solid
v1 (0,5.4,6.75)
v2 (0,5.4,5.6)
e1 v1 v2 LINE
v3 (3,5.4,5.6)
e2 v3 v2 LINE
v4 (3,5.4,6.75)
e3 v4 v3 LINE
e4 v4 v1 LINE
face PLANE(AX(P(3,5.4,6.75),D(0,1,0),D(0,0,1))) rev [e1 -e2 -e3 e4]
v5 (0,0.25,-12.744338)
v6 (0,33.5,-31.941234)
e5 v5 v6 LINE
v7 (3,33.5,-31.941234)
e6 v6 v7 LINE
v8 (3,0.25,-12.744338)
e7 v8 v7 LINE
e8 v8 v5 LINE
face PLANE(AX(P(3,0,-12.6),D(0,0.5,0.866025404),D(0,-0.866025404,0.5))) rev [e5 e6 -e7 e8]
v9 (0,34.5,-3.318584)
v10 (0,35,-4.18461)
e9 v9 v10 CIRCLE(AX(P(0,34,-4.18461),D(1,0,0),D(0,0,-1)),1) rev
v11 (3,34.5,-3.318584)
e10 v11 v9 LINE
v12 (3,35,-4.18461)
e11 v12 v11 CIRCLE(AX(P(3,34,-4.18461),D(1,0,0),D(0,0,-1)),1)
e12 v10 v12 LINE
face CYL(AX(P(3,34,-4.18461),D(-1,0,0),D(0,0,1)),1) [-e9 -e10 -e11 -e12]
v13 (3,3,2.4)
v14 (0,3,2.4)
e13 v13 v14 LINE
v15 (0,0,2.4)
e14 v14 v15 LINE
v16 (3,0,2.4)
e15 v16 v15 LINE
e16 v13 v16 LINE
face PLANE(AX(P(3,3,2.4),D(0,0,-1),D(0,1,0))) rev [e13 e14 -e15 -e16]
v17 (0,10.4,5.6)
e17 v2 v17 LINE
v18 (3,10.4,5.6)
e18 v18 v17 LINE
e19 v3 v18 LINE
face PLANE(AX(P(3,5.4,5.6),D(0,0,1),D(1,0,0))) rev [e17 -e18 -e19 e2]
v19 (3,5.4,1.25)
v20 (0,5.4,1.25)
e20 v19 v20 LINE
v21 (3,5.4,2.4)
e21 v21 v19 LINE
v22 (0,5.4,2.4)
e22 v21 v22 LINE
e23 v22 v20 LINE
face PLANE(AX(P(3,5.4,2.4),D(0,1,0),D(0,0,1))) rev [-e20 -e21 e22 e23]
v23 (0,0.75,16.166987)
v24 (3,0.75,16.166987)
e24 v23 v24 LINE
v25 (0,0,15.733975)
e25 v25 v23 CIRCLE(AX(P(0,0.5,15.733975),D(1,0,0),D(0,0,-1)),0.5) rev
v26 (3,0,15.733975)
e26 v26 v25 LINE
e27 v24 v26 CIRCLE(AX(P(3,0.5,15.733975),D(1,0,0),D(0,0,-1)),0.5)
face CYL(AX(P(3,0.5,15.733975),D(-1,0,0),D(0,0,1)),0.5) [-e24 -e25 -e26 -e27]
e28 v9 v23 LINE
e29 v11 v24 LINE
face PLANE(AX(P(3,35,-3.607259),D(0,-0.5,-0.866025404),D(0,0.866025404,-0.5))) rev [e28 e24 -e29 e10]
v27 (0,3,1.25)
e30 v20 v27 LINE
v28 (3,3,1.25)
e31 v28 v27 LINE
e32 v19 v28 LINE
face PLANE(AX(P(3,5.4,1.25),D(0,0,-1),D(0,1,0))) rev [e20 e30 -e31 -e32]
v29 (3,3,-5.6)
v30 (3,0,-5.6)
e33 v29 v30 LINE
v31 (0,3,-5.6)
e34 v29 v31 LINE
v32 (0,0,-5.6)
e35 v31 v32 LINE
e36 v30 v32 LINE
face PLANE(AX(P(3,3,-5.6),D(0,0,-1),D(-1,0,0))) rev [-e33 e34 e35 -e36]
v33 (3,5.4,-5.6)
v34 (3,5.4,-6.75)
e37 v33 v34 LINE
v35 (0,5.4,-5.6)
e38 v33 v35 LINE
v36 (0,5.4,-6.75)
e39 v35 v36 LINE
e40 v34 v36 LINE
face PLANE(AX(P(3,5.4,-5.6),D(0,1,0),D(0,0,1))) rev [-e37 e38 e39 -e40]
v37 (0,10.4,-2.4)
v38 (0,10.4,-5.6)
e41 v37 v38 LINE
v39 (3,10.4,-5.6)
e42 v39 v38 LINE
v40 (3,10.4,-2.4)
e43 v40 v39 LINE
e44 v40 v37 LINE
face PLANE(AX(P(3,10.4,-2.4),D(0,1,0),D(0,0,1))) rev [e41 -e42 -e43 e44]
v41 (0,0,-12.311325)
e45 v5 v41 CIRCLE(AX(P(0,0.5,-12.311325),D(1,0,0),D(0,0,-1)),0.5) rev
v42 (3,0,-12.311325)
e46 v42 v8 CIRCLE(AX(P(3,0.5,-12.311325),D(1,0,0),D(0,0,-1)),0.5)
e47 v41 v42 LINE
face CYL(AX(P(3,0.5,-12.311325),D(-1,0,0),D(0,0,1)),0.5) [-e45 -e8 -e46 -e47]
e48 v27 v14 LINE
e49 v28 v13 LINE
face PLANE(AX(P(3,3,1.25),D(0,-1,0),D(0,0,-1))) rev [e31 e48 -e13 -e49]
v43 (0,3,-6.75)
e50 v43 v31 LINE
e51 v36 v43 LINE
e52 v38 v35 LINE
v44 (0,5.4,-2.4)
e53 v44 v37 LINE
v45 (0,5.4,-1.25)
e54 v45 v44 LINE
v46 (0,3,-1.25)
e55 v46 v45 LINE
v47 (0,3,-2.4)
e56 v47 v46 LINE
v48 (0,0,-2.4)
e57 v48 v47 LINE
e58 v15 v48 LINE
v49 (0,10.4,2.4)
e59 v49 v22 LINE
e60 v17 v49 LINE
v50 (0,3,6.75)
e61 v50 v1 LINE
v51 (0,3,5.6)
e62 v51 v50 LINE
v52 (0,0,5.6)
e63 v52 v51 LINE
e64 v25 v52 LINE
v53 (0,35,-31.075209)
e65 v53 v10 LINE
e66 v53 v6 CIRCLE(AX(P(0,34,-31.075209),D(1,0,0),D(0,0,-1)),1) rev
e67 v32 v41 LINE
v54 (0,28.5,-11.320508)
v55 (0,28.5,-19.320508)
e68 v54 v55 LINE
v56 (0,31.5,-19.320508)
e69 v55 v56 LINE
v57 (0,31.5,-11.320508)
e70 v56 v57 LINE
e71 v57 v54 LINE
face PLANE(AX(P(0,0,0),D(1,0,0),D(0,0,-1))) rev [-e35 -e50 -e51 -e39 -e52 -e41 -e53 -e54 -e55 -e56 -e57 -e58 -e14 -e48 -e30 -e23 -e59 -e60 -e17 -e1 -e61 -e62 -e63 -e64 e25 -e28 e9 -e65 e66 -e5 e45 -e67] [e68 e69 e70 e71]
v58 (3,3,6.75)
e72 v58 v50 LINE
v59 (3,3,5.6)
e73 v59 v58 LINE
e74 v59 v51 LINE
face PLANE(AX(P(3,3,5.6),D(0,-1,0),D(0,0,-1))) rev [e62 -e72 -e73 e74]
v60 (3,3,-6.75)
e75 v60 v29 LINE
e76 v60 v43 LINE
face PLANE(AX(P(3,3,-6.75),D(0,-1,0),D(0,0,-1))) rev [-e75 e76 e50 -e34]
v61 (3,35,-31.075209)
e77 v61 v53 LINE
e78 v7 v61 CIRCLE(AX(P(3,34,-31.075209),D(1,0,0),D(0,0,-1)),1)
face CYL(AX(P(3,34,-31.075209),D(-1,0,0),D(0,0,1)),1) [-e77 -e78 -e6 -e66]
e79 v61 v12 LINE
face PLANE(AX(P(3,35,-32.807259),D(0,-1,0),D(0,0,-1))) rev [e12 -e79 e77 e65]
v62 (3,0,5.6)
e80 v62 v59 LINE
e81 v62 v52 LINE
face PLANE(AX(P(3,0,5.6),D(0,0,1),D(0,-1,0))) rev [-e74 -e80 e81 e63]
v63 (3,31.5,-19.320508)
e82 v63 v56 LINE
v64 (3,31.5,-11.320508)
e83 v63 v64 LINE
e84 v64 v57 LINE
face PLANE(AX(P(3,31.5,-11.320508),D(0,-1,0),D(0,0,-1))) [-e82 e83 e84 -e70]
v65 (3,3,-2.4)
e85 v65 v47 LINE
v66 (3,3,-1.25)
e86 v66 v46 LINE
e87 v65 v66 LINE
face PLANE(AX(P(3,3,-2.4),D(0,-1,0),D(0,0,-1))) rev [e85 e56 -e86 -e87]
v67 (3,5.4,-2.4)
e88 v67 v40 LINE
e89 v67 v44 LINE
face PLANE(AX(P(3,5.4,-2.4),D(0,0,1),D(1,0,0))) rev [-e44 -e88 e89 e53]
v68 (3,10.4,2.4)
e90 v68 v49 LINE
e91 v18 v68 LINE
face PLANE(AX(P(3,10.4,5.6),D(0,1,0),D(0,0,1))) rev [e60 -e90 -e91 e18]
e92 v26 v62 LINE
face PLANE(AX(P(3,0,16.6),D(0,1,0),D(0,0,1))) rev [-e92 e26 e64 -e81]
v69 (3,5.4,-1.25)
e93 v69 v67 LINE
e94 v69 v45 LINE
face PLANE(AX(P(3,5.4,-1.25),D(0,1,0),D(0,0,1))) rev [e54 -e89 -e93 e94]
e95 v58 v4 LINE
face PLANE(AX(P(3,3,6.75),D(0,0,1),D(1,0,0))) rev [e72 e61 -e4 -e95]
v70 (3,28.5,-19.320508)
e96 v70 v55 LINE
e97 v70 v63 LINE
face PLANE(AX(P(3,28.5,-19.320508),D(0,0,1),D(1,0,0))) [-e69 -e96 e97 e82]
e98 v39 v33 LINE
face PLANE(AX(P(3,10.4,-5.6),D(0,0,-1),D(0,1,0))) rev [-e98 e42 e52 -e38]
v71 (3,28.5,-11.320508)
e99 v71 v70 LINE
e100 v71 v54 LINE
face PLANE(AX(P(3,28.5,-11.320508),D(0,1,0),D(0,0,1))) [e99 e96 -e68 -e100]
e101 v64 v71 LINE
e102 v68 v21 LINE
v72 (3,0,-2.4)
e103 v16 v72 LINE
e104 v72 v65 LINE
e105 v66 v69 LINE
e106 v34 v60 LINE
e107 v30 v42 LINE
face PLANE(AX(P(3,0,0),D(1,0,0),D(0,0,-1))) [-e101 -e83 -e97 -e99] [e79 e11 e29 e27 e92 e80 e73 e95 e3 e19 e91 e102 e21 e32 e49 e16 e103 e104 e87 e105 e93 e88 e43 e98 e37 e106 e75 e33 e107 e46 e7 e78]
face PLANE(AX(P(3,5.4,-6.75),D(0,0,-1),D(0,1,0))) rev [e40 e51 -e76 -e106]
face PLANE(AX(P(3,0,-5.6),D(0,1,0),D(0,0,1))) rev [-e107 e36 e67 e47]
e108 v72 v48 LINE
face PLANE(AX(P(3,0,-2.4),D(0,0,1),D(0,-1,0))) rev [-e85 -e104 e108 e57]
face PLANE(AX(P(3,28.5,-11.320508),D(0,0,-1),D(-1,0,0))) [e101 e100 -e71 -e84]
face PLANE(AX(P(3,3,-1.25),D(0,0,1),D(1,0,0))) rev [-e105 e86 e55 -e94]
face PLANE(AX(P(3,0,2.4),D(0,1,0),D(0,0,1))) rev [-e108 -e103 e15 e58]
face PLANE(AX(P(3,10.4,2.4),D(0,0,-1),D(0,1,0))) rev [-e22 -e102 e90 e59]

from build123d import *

# Parameters (mm, degrees)
SKETCH1_W           = 8
SKETCH1_H           = 3
BOSS_EXTRUDE1_DEPTH = 3
FILLET1_R           = 1
FILLET2_R           = 0.5


with BuildPart() as part:
    # Sketch1 → Boss-Extrude1 (new body)
    with BuildSketch(Plane(origin=(0, 0, 0), x_dir=(0, 0, -1), z_dir=(1, 0, 0))):
        Polygon((-5.6, 0), (-5.6, 3), (-6.75, 3), (-6.75, 5.4), (-5.6, 5.4), (-5.6, 10.4), (-2.4, 10.4), (-2.4, 5.4), (-1.25, 5.4), (-1.25, 3), (-2.4, 3), (-2.4, 0), (2.4, 0), (2.4, 3), (1.25, 3), (1.25, 5.4), (2.4, 5.4), (2.4, 10.4), (5.6, 10.4), (5.6, 5.4), (6.75, 5.4), (6.75, 3), (5.6, 3), (5.6, 0), (12.6, 0), (32.807259422, 35), (3.607259422, 35), (-16.6, 0), align=None)
        with Locations((15.320508076, 30)):
            Rectangle(SKETCH1_W, SKETCH1_H, mode=Mode.SUBTRACT)
    extrude(amount=BOSS_EXTRUDE1_DEPTH)

    # Fillet1
    fillet1_edges = [part.edges().sort_by_distance(p)[0] for p in [
        (1.5, 35, -3.607259422),
        (1.5, 35, -32.807259422),
    ]]
    fillet(fillet1_edges, radius=FILLET1_R)

    # Fillet2
    fillet2_edges = [part.edges().sort_by_distance(p)[0] for p in [
        (1.5, 0, 16.6),
        (1.5, 0, -12.6),
    ]]
    fillet(fillet2_edges, radius=FILLET2_R)


solid = part.part
